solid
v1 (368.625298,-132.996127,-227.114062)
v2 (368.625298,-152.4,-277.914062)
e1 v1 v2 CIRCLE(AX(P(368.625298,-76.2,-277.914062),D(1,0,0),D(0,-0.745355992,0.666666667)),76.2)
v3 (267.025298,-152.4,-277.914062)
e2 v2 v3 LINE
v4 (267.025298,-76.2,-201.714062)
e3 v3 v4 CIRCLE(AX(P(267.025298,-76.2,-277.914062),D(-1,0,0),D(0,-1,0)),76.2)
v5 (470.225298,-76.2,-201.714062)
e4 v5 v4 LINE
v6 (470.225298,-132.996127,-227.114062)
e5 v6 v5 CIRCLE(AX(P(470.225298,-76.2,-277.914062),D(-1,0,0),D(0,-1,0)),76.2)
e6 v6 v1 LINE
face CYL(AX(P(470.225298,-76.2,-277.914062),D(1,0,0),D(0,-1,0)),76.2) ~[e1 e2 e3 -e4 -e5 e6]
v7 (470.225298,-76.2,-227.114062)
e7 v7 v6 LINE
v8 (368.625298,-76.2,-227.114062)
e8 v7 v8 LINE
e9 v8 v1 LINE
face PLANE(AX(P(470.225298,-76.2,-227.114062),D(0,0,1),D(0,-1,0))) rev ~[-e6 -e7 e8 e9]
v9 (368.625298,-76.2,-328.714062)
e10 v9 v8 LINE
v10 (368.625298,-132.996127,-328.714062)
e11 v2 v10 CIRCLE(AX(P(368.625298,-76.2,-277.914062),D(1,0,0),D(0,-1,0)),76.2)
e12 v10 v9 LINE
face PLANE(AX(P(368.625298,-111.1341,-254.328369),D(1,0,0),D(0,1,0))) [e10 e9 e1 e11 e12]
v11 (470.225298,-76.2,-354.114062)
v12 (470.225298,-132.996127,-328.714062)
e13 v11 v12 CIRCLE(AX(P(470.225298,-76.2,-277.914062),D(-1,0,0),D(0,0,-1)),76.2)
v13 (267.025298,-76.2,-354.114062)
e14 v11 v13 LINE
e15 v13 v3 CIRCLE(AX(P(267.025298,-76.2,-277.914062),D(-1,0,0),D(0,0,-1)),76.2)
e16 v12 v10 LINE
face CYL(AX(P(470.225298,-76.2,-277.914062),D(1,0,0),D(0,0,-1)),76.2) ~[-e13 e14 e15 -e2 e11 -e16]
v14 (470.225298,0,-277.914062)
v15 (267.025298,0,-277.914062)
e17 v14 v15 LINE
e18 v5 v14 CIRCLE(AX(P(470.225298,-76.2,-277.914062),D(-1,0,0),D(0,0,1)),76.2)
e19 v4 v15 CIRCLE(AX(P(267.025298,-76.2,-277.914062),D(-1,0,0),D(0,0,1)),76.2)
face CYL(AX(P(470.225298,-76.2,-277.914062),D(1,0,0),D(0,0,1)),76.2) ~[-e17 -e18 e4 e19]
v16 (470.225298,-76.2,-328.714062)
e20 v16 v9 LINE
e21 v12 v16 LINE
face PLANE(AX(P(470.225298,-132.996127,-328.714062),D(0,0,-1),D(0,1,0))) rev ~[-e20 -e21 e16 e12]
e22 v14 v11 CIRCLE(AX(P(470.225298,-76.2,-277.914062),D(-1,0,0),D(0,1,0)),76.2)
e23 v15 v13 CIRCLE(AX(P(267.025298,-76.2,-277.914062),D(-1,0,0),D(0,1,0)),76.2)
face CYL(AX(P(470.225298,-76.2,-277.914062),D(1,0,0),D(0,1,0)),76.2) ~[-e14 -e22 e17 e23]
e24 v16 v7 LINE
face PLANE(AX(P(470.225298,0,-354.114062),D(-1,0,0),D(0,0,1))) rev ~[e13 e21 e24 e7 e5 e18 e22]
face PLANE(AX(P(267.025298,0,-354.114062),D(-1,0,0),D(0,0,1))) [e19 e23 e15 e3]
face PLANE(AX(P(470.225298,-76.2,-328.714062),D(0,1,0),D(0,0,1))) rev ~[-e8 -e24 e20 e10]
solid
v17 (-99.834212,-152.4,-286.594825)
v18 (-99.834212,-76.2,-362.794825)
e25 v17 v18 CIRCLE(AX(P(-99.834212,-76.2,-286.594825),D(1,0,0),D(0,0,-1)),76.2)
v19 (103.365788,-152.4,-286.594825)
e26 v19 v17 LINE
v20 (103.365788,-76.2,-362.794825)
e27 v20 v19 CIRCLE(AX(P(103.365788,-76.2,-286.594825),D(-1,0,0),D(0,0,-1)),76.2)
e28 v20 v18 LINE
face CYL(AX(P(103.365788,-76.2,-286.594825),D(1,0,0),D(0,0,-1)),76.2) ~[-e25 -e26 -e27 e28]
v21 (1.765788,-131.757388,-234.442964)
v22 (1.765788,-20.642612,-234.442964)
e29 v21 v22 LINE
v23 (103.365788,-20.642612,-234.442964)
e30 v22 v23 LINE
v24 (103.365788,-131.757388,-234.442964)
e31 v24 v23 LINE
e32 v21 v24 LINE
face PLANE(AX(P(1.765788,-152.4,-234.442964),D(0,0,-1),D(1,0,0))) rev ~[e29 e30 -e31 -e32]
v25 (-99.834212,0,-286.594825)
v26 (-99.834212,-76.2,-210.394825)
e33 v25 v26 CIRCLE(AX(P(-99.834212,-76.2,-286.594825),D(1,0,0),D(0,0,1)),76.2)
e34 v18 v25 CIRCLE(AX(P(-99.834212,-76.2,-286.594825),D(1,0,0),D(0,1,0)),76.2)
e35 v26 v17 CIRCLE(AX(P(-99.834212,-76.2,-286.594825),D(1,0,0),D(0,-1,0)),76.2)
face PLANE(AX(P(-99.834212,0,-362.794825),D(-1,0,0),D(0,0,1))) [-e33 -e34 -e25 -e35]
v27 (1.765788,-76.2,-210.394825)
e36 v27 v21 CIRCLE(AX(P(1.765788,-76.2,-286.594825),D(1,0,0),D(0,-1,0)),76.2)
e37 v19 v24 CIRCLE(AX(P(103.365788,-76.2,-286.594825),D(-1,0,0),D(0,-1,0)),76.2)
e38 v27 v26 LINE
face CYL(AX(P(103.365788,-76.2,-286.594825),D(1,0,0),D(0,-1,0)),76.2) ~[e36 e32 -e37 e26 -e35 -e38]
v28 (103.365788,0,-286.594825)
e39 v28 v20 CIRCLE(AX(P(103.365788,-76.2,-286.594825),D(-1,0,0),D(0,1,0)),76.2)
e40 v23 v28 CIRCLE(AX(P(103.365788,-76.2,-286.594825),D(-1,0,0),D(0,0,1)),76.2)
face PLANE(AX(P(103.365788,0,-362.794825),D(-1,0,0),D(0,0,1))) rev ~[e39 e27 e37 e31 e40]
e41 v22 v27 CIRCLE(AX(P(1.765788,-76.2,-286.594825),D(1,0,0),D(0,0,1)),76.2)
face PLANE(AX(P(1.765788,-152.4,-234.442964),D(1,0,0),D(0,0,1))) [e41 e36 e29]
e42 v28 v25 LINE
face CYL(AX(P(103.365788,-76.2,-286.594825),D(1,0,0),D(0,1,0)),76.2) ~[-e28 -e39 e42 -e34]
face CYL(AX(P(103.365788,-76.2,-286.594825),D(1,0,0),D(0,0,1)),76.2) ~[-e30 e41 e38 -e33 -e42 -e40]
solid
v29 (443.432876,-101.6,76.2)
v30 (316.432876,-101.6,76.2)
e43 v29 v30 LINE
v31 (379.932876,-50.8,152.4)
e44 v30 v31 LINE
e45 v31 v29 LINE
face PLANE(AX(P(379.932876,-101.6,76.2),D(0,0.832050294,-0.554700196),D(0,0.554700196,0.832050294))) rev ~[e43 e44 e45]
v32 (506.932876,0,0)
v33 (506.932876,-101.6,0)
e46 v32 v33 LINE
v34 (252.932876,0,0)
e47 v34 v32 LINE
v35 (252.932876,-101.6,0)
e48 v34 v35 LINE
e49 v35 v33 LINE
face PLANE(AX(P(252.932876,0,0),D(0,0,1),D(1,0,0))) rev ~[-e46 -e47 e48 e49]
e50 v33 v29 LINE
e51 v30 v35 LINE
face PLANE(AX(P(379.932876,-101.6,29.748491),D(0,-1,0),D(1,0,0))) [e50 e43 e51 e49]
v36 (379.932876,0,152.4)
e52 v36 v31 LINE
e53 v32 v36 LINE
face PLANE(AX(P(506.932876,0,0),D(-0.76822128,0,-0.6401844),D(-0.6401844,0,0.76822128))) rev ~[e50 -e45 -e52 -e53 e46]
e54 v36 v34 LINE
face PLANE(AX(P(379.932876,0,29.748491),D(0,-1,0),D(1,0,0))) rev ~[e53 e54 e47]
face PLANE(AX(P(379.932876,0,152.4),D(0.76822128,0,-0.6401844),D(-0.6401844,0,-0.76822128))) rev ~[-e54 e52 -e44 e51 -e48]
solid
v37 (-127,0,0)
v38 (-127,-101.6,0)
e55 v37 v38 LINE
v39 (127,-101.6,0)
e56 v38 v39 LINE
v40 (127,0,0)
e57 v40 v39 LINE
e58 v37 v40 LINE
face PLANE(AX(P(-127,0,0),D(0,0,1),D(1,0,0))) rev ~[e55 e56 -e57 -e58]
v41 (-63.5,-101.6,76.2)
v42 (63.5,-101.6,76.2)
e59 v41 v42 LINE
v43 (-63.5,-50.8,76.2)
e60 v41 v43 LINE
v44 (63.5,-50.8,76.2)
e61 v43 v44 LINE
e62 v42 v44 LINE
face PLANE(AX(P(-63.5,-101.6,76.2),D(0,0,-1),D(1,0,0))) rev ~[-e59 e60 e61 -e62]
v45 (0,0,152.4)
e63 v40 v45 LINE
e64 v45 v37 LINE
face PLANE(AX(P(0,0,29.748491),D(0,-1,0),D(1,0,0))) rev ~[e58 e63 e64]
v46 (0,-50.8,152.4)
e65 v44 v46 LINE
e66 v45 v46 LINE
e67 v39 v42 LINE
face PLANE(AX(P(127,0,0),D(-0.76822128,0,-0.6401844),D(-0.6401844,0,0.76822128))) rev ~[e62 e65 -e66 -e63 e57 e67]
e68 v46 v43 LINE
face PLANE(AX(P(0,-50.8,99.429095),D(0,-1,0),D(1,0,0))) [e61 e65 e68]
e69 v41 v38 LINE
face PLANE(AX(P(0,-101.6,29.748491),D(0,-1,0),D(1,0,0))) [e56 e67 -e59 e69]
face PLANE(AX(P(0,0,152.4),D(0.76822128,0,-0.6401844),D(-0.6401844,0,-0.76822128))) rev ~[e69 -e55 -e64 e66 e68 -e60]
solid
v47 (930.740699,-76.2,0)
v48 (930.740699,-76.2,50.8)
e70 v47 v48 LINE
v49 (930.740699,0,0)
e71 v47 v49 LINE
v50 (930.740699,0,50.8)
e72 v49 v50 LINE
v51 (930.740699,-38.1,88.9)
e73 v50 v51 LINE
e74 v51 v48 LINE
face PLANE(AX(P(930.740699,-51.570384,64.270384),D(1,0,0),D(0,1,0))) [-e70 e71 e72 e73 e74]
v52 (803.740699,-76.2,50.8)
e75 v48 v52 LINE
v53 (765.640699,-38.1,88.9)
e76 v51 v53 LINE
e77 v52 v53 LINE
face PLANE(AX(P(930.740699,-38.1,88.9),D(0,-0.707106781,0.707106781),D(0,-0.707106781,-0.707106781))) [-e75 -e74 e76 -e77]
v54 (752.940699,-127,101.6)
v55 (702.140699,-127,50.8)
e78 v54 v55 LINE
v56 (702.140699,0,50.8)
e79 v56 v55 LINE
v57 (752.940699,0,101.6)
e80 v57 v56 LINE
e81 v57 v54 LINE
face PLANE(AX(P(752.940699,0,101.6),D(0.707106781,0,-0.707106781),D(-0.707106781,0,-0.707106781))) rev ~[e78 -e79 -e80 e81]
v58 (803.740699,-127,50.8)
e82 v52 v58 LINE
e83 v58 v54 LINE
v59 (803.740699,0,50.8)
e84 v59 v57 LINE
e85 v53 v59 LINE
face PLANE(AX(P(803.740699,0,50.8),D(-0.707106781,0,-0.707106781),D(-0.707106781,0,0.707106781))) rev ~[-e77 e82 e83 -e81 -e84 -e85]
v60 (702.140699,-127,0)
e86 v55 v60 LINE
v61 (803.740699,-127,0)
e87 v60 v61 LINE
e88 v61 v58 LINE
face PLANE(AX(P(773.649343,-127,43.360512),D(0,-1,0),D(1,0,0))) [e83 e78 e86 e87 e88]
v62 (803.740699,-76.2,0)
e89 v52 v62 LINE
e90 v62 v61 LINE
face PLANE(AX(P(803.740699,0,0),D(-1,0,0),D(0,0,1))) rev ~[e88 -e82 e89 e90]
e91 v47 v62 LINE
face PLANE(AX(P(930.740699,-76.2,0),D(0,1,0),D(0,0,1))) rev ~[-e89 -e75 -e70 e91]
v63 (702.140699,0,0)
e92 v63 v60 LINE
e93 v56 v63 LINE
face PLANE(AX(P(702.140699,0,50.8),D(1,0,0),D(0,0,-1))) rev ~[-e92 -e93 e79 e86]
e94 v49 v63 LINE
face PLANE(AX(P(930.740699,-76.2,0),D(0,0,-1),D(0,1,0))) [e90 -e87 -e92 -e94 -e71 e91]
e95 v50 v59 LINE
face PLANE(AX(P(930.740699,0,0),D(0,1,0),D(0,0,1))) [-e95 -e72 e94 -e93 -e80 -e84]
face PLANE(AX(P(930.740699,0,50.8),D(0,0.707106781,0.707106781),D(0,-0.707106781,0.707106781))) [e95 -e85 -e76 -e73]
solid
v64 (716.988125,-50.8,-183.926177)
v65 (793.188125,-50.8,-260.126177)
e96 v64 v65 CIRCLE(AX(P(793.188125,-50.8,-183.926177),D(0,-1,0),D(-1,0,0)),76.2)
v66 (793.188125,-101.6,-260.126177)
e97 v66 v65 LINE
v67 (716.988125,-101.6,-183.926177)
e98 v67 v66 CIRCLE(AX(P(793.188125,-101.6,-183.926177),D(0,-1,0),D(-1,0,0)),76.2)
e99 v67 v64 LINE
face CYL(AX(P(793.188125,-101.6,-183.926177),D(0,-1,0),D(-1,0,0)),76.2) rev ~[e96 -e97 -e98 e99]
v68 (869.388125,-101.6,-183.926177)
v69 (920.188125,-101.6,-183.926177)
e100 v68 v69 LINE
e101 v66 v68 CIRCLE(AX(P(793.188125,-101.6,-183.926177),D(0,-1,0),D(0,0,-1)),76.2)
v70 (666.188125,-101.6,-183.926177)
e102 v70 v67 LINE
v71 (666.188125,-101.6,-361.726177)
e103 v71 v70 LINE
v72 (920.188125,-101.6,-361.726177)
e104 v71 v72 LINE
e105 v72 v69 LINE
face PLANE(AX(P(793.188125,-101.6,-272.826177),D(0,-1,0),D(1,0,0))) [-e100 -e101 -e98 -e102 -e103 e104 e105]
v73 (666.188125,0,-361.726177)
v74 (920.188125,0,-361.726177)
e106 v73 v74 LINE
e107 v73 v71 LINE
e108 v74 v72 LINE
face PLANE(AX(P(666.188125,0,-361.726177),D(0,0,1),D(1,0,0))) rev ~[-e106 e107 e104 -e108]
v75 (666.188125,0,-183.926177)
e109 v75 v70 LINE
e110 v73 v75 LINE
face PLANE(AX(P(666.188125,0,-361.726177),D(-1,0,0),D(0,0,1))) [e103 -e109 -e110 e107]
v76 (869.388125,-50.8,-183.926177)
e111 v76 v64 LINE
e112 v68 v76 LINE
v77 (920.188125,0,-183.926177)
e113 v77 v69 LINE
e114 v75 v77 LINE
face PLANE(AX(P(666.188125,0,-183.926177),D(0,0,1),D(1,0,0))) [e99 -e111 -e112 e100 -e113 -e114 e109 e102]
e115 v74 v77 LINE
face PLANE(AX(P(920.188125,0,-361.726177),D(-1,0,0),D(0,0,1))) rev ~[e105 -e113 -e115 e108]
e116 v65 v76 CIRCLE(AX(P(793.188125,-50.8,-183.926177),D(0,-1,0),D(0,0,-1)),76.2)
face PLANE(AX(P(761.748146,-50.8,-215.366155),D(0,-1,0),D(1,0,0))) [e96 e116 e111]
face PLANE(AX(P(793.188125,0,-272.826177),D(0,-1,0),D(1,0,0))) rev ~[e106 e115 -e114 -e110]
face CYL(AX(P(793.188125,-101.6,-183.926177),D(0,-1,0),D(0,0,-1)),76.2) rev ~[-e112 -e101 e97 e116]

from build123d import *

# Parameters (mm, degrees)
F1_DEPTH  = 101.6
F3_DEPTH  = 50.8
F5_DEPTH  = 101.6
F9_DEPTH  = 76.2
F11_DEPTH = 127
F13_W     = 38.1
F13_H     = 50.8
F14_DEPTH = 177.8
F15_W     = 203.2
F15_H     = 152.4
F16_DEPTH = 152.4
F19_DEPTH = 360.68
F18_W     = 101.6
F18_H     = 24.0481388064
F20_DEPTH = 185.42
F21_W     = 203.2
F21_H     = 152.4
F22_DEPTH = 152.4
F25_DEPTH = 203.2
F26_DEPTH = 101.6
F27_W     = 254
F27_H     = 177.8
F28_DEPTH = 101.6
F30_DEPTH = 50.8


with BuildPart() as f1:
    # F0 (on Front) → F1 (new body)
    with BuildSketch(Plane.XZ):
        Polygon((-127, 0), (0, 0), (127, 0), (63.5, 76.2), (0, 76.2), (-63.5, 76.2), align=None)
        Polygon((0, 76.2), (63.5, 76.2), (0, 152.4), (-63.5, 76.2), align=None)
    extrude(amount=F1_DEPTH)

    # F2 (on face) → F3 (cut)
    with BuildSketch(Plane.XZ.offset(101.6)):
        Polygon((-63.5, 76.2), (0, 76.2), (63.5, 76.2), (0, 152.4), align=None)
    extrude(amount=-F3_DEPTH, mode=Mode.SUBTRACT)


with BuildPart() as f5:
    # F4 (on Front) → F5 (new body)
    with BuildSketch(Plane.XZ):
        Polygon((316.4328755193, 76.2), (252.9328755193, 0), (506.9328755193, 0), (443.4328755193, 76.2), align=None)
        Polygon((379.9328755193, 152.4), (316.4328755193, 76.2), (443.4328755193, 76.2), align=None)
    extrude(amount=F5_DEPTH)

    # F8 (on 3pt) → F9 (cut, symmetric)
    with BuildSketch(Plane.YZ.offset(379.9328755193)):
        Polygon((-50.8, 152.4), (-101.6, 152.4), (-101.6, 76.2), align=None)
    extrude(amount=F9_DEPTH, both=True, mode=Mode.SUBTRACT)


with BuildPart() as f11:
    # F10 (on Front) → F11 (new body)
    with BuildSketch(Plane.XZ):
        Polygon((752.9406986994, 101.6), (752.9406986994, 0), (803.7406986994, 0), (803.7406986994, 50.8), align=None)
        Polygon((702.1406986994, 50.8), (702.1406986994, 0), (752.9406986994, 0), (752.9406986994, 101.6), align=None)
    extrude(amount=F11_DEPTH)

    # F13 (on offset) → F14 (join)
    with BuildSketch(Plane.YZ.offset(930.7406986994)):
        Polygon((-76.2, 50.8), (-38.1, 50.8), (-38.1, 88.9), align=None)
        Polygon((-38.1, 50.8), (0, 50.8), (-38.1, 88.9), align=None)
        with Locations((-19.05, 25.4)):
            Rectangle(F13_W, F13_H)
        with Locations((-57.15, 25.4)):
            Rectangle(F13_W, F13_H)
    extrude(amount=-F14_DEPTH)


with BuildPart() as f16:
    # F15 (on Front) → F16 (new body)
    with BuildSketch(Plane.XZ):
        with Locations((1.7657876015, -286.5948253898)):
            Rectangle(F15_W, F15_H)
    extrude(amount=F16_DEPTH)

    # F17 (on face) → F19 (cut)
    with BuildSketch(Plane.YZ.offset(103.3657876015)):
        with BuildLine():
            ThreePointArc((-152.4, -286.5948253898), (-130.0815367264, -232.7132886634), (-76.2, -210.3948253898))
            Line((-76.2, -210.3948253898), (-152.4, -210.3948253898))
            Line((-152.4, -210.3948253898), (-152.4, -286.5948253898))
        make_face()
        with BuildLine():
            Line((0, -210.3948253898), (-76.2, -210.3948253898))
            ThreePointArc((-76.2, -210.3948253898), (-22.3184632736, -232.7132886634), (0, -286.5948253898))
            Line((0, -286.5948253898), (0, -210.3948253898))
        make_face()
        with BuildLine():
            Line((0, -362.7948253898), (0, -286.5948253898))
            ThreePointArc((0, -286.5948253898), (-22.3184632736, -340.4763621162), (-76.2, -362.7948253898))
            Line((-76.2, -362.7948253898), (0, -362.7948253898))
        make_face()
        with BuildLine():
            ThreePointArc((-76.2, -362.7948253898), (-130.0815367264, -340.4763621162), (-152.4, -286.5948253898))
            Line((-152.4, -286.5948253898), (-152.4, -362.7948253898))
            Line((-152.4, -362.7948253898), (-76.2, -362.7948253898))
        make_face()
    extrude(amount=-F19_DEPTH, mode=Mode.SUBTRACT)

    # F18 (on face) → F20 (cut)
    with BuildSketch(Plane.XZ.offset(152.4)):
        with Locations((52.5657876015, -222.418894793)):
            Rectangle(F18_W, F18_H)
    extrude(amount=-F20_DEPTH, mode=Mode.SUBTRACT)


with BuildPart() as f22:
    # F21 (on Front) → F22 (new body)
    with BuildSketch(Plane.XZ):
        with Locations((368.6252981424, -277.9140620219)):
            Rectangle(F21_W, F21_H)
    extrude(amount=F22_DEPTH)

    # F23 (on face) → F25 (cut)
    with BuildSketch(Plane.YZ.offset(470.2252981424)):
        with BuildLine():
            Line((-152.4, -201.7140620219), (-152.4, -277.9140620219))
            ThreePointArc((-152.4, -277.9140620219), (-130.0815367264, -224.0325252955), (-76.2, -201.7140620219))
            Line((-76.2, -201.7140620219), (-152.4, -201.7140620219))
        make_face()
        with BuildLine():
            ThreePointArc((-76.2, -201.7140620219), (-22.3184632736, -224.0325252955), (0, -277.9140620219))
            Line((0, -277.9140620219), (0, -201.7140620219))
            Line((0, -201.7140620219), (-76.2, -201.7140620219))
        make_face()
        with BuildLine():
            ThreePointArc((0, -277.9140620219), (-22.3184632736, -331.7955987483), (-76.2, -354.1140620219))
            Line((-76.2, -354.1140620219), (0, -354.1140620219))
            Line((0, -354.1140620219), (0, -277.9140620219))
        make_face()
        with BuildLine():
            Line((-152.4, -354.1140620219), (-76.2, -354.1140620219))
            ThreePointArc((-76.2, -354.1140620219), (-130.0815367264, -331.7955987483), (-152.4, -277.9140620219))
            Line((-152.4, -277.9140620219), (-152.4, -354.1140620219))
        make_face()
    extrude(amount=-F25_DEPTH, mode=Mode.SUBTRACT)

    # F24 (on face) → F26 (cut)
    with BuildSketch(Plane.YZ.offset(470.2252981424)):
        with BuildLine():
            Line((-76.2, -227.1140620219), (-132.9961266285, -227.1140620219))
            ThreePointArc((-132.9961266285, -227.1140620219), (-147.383933753, -250.7242187812), (-152.4, -277.9140620219))
            Line((-152.4, -277.9140620219), (-76.2, -277.9140620219))
            Line((-76.2, -277.9140620219), (-76.2, -227.1140620219))
        make_face()
        with BuildLine():
            Line((-76.2, -277.9140620219), (-152.4, -277.9140620219))
            ThreePointArc((-152.4, -277.9140620219), (-147.383933753, -305.1039052626), (-132.9961266285, -328.7140620219))
            Line((-132.9961266285, -328.7140620219), (-76.2, -328.7140620219))
            Line((-76.2, -328.7140620219), (-76.2, -277.9140620219))
        make_face()
    extrude(amount=-F26_DEPTH, mode=Mode.SUBTRACT)


with BuildPart() as f28:
    # F27 (on Front) → F28 (new body)
    with BuildSketch(Plane.XZ):
        with Locations((793.1881248951, -272.8261766908)):
            Rectangle(F27_W, F27_H)
    extrude(amount=F28_DEPTH)

    # F29 (on face) → F30 (cut)
    with BuildSketch(Plane.XZ.offset(101.6)):
        with BuildLine():
            Line((793.1881248951, -260.1261766908), (793.1881248951, -183.9261766908))
            Line((793.1881248951, -183.9261766908), (716.9881248951, -183.9261766908))
            ThreePointArc((716.9881248951, -183.9261766908), (739.3065881687, -237.8077134172), (793.1881248951, -260.1261766908))
        make_face()
        with BuildLine():
            Line((869.3881248951, -183.9261766908), (793.1881248951, -183.9261766908))
            Line((793.1881248951, -183.9261766908), (793.1881248951, -260.1261766908))
            ThreePointArc((793.1881248951, -260.1261766908), (847.0696616215, -237.8077134172), (869.3881248951, -183.9261766908))
        make_face()
    extrude(amount=-F30_DEPTH, mode=Mode.SUBTRACT)


solid = Compound([f1.part, f5.part, f11.part, f16.part, f22.part, f28.part])
